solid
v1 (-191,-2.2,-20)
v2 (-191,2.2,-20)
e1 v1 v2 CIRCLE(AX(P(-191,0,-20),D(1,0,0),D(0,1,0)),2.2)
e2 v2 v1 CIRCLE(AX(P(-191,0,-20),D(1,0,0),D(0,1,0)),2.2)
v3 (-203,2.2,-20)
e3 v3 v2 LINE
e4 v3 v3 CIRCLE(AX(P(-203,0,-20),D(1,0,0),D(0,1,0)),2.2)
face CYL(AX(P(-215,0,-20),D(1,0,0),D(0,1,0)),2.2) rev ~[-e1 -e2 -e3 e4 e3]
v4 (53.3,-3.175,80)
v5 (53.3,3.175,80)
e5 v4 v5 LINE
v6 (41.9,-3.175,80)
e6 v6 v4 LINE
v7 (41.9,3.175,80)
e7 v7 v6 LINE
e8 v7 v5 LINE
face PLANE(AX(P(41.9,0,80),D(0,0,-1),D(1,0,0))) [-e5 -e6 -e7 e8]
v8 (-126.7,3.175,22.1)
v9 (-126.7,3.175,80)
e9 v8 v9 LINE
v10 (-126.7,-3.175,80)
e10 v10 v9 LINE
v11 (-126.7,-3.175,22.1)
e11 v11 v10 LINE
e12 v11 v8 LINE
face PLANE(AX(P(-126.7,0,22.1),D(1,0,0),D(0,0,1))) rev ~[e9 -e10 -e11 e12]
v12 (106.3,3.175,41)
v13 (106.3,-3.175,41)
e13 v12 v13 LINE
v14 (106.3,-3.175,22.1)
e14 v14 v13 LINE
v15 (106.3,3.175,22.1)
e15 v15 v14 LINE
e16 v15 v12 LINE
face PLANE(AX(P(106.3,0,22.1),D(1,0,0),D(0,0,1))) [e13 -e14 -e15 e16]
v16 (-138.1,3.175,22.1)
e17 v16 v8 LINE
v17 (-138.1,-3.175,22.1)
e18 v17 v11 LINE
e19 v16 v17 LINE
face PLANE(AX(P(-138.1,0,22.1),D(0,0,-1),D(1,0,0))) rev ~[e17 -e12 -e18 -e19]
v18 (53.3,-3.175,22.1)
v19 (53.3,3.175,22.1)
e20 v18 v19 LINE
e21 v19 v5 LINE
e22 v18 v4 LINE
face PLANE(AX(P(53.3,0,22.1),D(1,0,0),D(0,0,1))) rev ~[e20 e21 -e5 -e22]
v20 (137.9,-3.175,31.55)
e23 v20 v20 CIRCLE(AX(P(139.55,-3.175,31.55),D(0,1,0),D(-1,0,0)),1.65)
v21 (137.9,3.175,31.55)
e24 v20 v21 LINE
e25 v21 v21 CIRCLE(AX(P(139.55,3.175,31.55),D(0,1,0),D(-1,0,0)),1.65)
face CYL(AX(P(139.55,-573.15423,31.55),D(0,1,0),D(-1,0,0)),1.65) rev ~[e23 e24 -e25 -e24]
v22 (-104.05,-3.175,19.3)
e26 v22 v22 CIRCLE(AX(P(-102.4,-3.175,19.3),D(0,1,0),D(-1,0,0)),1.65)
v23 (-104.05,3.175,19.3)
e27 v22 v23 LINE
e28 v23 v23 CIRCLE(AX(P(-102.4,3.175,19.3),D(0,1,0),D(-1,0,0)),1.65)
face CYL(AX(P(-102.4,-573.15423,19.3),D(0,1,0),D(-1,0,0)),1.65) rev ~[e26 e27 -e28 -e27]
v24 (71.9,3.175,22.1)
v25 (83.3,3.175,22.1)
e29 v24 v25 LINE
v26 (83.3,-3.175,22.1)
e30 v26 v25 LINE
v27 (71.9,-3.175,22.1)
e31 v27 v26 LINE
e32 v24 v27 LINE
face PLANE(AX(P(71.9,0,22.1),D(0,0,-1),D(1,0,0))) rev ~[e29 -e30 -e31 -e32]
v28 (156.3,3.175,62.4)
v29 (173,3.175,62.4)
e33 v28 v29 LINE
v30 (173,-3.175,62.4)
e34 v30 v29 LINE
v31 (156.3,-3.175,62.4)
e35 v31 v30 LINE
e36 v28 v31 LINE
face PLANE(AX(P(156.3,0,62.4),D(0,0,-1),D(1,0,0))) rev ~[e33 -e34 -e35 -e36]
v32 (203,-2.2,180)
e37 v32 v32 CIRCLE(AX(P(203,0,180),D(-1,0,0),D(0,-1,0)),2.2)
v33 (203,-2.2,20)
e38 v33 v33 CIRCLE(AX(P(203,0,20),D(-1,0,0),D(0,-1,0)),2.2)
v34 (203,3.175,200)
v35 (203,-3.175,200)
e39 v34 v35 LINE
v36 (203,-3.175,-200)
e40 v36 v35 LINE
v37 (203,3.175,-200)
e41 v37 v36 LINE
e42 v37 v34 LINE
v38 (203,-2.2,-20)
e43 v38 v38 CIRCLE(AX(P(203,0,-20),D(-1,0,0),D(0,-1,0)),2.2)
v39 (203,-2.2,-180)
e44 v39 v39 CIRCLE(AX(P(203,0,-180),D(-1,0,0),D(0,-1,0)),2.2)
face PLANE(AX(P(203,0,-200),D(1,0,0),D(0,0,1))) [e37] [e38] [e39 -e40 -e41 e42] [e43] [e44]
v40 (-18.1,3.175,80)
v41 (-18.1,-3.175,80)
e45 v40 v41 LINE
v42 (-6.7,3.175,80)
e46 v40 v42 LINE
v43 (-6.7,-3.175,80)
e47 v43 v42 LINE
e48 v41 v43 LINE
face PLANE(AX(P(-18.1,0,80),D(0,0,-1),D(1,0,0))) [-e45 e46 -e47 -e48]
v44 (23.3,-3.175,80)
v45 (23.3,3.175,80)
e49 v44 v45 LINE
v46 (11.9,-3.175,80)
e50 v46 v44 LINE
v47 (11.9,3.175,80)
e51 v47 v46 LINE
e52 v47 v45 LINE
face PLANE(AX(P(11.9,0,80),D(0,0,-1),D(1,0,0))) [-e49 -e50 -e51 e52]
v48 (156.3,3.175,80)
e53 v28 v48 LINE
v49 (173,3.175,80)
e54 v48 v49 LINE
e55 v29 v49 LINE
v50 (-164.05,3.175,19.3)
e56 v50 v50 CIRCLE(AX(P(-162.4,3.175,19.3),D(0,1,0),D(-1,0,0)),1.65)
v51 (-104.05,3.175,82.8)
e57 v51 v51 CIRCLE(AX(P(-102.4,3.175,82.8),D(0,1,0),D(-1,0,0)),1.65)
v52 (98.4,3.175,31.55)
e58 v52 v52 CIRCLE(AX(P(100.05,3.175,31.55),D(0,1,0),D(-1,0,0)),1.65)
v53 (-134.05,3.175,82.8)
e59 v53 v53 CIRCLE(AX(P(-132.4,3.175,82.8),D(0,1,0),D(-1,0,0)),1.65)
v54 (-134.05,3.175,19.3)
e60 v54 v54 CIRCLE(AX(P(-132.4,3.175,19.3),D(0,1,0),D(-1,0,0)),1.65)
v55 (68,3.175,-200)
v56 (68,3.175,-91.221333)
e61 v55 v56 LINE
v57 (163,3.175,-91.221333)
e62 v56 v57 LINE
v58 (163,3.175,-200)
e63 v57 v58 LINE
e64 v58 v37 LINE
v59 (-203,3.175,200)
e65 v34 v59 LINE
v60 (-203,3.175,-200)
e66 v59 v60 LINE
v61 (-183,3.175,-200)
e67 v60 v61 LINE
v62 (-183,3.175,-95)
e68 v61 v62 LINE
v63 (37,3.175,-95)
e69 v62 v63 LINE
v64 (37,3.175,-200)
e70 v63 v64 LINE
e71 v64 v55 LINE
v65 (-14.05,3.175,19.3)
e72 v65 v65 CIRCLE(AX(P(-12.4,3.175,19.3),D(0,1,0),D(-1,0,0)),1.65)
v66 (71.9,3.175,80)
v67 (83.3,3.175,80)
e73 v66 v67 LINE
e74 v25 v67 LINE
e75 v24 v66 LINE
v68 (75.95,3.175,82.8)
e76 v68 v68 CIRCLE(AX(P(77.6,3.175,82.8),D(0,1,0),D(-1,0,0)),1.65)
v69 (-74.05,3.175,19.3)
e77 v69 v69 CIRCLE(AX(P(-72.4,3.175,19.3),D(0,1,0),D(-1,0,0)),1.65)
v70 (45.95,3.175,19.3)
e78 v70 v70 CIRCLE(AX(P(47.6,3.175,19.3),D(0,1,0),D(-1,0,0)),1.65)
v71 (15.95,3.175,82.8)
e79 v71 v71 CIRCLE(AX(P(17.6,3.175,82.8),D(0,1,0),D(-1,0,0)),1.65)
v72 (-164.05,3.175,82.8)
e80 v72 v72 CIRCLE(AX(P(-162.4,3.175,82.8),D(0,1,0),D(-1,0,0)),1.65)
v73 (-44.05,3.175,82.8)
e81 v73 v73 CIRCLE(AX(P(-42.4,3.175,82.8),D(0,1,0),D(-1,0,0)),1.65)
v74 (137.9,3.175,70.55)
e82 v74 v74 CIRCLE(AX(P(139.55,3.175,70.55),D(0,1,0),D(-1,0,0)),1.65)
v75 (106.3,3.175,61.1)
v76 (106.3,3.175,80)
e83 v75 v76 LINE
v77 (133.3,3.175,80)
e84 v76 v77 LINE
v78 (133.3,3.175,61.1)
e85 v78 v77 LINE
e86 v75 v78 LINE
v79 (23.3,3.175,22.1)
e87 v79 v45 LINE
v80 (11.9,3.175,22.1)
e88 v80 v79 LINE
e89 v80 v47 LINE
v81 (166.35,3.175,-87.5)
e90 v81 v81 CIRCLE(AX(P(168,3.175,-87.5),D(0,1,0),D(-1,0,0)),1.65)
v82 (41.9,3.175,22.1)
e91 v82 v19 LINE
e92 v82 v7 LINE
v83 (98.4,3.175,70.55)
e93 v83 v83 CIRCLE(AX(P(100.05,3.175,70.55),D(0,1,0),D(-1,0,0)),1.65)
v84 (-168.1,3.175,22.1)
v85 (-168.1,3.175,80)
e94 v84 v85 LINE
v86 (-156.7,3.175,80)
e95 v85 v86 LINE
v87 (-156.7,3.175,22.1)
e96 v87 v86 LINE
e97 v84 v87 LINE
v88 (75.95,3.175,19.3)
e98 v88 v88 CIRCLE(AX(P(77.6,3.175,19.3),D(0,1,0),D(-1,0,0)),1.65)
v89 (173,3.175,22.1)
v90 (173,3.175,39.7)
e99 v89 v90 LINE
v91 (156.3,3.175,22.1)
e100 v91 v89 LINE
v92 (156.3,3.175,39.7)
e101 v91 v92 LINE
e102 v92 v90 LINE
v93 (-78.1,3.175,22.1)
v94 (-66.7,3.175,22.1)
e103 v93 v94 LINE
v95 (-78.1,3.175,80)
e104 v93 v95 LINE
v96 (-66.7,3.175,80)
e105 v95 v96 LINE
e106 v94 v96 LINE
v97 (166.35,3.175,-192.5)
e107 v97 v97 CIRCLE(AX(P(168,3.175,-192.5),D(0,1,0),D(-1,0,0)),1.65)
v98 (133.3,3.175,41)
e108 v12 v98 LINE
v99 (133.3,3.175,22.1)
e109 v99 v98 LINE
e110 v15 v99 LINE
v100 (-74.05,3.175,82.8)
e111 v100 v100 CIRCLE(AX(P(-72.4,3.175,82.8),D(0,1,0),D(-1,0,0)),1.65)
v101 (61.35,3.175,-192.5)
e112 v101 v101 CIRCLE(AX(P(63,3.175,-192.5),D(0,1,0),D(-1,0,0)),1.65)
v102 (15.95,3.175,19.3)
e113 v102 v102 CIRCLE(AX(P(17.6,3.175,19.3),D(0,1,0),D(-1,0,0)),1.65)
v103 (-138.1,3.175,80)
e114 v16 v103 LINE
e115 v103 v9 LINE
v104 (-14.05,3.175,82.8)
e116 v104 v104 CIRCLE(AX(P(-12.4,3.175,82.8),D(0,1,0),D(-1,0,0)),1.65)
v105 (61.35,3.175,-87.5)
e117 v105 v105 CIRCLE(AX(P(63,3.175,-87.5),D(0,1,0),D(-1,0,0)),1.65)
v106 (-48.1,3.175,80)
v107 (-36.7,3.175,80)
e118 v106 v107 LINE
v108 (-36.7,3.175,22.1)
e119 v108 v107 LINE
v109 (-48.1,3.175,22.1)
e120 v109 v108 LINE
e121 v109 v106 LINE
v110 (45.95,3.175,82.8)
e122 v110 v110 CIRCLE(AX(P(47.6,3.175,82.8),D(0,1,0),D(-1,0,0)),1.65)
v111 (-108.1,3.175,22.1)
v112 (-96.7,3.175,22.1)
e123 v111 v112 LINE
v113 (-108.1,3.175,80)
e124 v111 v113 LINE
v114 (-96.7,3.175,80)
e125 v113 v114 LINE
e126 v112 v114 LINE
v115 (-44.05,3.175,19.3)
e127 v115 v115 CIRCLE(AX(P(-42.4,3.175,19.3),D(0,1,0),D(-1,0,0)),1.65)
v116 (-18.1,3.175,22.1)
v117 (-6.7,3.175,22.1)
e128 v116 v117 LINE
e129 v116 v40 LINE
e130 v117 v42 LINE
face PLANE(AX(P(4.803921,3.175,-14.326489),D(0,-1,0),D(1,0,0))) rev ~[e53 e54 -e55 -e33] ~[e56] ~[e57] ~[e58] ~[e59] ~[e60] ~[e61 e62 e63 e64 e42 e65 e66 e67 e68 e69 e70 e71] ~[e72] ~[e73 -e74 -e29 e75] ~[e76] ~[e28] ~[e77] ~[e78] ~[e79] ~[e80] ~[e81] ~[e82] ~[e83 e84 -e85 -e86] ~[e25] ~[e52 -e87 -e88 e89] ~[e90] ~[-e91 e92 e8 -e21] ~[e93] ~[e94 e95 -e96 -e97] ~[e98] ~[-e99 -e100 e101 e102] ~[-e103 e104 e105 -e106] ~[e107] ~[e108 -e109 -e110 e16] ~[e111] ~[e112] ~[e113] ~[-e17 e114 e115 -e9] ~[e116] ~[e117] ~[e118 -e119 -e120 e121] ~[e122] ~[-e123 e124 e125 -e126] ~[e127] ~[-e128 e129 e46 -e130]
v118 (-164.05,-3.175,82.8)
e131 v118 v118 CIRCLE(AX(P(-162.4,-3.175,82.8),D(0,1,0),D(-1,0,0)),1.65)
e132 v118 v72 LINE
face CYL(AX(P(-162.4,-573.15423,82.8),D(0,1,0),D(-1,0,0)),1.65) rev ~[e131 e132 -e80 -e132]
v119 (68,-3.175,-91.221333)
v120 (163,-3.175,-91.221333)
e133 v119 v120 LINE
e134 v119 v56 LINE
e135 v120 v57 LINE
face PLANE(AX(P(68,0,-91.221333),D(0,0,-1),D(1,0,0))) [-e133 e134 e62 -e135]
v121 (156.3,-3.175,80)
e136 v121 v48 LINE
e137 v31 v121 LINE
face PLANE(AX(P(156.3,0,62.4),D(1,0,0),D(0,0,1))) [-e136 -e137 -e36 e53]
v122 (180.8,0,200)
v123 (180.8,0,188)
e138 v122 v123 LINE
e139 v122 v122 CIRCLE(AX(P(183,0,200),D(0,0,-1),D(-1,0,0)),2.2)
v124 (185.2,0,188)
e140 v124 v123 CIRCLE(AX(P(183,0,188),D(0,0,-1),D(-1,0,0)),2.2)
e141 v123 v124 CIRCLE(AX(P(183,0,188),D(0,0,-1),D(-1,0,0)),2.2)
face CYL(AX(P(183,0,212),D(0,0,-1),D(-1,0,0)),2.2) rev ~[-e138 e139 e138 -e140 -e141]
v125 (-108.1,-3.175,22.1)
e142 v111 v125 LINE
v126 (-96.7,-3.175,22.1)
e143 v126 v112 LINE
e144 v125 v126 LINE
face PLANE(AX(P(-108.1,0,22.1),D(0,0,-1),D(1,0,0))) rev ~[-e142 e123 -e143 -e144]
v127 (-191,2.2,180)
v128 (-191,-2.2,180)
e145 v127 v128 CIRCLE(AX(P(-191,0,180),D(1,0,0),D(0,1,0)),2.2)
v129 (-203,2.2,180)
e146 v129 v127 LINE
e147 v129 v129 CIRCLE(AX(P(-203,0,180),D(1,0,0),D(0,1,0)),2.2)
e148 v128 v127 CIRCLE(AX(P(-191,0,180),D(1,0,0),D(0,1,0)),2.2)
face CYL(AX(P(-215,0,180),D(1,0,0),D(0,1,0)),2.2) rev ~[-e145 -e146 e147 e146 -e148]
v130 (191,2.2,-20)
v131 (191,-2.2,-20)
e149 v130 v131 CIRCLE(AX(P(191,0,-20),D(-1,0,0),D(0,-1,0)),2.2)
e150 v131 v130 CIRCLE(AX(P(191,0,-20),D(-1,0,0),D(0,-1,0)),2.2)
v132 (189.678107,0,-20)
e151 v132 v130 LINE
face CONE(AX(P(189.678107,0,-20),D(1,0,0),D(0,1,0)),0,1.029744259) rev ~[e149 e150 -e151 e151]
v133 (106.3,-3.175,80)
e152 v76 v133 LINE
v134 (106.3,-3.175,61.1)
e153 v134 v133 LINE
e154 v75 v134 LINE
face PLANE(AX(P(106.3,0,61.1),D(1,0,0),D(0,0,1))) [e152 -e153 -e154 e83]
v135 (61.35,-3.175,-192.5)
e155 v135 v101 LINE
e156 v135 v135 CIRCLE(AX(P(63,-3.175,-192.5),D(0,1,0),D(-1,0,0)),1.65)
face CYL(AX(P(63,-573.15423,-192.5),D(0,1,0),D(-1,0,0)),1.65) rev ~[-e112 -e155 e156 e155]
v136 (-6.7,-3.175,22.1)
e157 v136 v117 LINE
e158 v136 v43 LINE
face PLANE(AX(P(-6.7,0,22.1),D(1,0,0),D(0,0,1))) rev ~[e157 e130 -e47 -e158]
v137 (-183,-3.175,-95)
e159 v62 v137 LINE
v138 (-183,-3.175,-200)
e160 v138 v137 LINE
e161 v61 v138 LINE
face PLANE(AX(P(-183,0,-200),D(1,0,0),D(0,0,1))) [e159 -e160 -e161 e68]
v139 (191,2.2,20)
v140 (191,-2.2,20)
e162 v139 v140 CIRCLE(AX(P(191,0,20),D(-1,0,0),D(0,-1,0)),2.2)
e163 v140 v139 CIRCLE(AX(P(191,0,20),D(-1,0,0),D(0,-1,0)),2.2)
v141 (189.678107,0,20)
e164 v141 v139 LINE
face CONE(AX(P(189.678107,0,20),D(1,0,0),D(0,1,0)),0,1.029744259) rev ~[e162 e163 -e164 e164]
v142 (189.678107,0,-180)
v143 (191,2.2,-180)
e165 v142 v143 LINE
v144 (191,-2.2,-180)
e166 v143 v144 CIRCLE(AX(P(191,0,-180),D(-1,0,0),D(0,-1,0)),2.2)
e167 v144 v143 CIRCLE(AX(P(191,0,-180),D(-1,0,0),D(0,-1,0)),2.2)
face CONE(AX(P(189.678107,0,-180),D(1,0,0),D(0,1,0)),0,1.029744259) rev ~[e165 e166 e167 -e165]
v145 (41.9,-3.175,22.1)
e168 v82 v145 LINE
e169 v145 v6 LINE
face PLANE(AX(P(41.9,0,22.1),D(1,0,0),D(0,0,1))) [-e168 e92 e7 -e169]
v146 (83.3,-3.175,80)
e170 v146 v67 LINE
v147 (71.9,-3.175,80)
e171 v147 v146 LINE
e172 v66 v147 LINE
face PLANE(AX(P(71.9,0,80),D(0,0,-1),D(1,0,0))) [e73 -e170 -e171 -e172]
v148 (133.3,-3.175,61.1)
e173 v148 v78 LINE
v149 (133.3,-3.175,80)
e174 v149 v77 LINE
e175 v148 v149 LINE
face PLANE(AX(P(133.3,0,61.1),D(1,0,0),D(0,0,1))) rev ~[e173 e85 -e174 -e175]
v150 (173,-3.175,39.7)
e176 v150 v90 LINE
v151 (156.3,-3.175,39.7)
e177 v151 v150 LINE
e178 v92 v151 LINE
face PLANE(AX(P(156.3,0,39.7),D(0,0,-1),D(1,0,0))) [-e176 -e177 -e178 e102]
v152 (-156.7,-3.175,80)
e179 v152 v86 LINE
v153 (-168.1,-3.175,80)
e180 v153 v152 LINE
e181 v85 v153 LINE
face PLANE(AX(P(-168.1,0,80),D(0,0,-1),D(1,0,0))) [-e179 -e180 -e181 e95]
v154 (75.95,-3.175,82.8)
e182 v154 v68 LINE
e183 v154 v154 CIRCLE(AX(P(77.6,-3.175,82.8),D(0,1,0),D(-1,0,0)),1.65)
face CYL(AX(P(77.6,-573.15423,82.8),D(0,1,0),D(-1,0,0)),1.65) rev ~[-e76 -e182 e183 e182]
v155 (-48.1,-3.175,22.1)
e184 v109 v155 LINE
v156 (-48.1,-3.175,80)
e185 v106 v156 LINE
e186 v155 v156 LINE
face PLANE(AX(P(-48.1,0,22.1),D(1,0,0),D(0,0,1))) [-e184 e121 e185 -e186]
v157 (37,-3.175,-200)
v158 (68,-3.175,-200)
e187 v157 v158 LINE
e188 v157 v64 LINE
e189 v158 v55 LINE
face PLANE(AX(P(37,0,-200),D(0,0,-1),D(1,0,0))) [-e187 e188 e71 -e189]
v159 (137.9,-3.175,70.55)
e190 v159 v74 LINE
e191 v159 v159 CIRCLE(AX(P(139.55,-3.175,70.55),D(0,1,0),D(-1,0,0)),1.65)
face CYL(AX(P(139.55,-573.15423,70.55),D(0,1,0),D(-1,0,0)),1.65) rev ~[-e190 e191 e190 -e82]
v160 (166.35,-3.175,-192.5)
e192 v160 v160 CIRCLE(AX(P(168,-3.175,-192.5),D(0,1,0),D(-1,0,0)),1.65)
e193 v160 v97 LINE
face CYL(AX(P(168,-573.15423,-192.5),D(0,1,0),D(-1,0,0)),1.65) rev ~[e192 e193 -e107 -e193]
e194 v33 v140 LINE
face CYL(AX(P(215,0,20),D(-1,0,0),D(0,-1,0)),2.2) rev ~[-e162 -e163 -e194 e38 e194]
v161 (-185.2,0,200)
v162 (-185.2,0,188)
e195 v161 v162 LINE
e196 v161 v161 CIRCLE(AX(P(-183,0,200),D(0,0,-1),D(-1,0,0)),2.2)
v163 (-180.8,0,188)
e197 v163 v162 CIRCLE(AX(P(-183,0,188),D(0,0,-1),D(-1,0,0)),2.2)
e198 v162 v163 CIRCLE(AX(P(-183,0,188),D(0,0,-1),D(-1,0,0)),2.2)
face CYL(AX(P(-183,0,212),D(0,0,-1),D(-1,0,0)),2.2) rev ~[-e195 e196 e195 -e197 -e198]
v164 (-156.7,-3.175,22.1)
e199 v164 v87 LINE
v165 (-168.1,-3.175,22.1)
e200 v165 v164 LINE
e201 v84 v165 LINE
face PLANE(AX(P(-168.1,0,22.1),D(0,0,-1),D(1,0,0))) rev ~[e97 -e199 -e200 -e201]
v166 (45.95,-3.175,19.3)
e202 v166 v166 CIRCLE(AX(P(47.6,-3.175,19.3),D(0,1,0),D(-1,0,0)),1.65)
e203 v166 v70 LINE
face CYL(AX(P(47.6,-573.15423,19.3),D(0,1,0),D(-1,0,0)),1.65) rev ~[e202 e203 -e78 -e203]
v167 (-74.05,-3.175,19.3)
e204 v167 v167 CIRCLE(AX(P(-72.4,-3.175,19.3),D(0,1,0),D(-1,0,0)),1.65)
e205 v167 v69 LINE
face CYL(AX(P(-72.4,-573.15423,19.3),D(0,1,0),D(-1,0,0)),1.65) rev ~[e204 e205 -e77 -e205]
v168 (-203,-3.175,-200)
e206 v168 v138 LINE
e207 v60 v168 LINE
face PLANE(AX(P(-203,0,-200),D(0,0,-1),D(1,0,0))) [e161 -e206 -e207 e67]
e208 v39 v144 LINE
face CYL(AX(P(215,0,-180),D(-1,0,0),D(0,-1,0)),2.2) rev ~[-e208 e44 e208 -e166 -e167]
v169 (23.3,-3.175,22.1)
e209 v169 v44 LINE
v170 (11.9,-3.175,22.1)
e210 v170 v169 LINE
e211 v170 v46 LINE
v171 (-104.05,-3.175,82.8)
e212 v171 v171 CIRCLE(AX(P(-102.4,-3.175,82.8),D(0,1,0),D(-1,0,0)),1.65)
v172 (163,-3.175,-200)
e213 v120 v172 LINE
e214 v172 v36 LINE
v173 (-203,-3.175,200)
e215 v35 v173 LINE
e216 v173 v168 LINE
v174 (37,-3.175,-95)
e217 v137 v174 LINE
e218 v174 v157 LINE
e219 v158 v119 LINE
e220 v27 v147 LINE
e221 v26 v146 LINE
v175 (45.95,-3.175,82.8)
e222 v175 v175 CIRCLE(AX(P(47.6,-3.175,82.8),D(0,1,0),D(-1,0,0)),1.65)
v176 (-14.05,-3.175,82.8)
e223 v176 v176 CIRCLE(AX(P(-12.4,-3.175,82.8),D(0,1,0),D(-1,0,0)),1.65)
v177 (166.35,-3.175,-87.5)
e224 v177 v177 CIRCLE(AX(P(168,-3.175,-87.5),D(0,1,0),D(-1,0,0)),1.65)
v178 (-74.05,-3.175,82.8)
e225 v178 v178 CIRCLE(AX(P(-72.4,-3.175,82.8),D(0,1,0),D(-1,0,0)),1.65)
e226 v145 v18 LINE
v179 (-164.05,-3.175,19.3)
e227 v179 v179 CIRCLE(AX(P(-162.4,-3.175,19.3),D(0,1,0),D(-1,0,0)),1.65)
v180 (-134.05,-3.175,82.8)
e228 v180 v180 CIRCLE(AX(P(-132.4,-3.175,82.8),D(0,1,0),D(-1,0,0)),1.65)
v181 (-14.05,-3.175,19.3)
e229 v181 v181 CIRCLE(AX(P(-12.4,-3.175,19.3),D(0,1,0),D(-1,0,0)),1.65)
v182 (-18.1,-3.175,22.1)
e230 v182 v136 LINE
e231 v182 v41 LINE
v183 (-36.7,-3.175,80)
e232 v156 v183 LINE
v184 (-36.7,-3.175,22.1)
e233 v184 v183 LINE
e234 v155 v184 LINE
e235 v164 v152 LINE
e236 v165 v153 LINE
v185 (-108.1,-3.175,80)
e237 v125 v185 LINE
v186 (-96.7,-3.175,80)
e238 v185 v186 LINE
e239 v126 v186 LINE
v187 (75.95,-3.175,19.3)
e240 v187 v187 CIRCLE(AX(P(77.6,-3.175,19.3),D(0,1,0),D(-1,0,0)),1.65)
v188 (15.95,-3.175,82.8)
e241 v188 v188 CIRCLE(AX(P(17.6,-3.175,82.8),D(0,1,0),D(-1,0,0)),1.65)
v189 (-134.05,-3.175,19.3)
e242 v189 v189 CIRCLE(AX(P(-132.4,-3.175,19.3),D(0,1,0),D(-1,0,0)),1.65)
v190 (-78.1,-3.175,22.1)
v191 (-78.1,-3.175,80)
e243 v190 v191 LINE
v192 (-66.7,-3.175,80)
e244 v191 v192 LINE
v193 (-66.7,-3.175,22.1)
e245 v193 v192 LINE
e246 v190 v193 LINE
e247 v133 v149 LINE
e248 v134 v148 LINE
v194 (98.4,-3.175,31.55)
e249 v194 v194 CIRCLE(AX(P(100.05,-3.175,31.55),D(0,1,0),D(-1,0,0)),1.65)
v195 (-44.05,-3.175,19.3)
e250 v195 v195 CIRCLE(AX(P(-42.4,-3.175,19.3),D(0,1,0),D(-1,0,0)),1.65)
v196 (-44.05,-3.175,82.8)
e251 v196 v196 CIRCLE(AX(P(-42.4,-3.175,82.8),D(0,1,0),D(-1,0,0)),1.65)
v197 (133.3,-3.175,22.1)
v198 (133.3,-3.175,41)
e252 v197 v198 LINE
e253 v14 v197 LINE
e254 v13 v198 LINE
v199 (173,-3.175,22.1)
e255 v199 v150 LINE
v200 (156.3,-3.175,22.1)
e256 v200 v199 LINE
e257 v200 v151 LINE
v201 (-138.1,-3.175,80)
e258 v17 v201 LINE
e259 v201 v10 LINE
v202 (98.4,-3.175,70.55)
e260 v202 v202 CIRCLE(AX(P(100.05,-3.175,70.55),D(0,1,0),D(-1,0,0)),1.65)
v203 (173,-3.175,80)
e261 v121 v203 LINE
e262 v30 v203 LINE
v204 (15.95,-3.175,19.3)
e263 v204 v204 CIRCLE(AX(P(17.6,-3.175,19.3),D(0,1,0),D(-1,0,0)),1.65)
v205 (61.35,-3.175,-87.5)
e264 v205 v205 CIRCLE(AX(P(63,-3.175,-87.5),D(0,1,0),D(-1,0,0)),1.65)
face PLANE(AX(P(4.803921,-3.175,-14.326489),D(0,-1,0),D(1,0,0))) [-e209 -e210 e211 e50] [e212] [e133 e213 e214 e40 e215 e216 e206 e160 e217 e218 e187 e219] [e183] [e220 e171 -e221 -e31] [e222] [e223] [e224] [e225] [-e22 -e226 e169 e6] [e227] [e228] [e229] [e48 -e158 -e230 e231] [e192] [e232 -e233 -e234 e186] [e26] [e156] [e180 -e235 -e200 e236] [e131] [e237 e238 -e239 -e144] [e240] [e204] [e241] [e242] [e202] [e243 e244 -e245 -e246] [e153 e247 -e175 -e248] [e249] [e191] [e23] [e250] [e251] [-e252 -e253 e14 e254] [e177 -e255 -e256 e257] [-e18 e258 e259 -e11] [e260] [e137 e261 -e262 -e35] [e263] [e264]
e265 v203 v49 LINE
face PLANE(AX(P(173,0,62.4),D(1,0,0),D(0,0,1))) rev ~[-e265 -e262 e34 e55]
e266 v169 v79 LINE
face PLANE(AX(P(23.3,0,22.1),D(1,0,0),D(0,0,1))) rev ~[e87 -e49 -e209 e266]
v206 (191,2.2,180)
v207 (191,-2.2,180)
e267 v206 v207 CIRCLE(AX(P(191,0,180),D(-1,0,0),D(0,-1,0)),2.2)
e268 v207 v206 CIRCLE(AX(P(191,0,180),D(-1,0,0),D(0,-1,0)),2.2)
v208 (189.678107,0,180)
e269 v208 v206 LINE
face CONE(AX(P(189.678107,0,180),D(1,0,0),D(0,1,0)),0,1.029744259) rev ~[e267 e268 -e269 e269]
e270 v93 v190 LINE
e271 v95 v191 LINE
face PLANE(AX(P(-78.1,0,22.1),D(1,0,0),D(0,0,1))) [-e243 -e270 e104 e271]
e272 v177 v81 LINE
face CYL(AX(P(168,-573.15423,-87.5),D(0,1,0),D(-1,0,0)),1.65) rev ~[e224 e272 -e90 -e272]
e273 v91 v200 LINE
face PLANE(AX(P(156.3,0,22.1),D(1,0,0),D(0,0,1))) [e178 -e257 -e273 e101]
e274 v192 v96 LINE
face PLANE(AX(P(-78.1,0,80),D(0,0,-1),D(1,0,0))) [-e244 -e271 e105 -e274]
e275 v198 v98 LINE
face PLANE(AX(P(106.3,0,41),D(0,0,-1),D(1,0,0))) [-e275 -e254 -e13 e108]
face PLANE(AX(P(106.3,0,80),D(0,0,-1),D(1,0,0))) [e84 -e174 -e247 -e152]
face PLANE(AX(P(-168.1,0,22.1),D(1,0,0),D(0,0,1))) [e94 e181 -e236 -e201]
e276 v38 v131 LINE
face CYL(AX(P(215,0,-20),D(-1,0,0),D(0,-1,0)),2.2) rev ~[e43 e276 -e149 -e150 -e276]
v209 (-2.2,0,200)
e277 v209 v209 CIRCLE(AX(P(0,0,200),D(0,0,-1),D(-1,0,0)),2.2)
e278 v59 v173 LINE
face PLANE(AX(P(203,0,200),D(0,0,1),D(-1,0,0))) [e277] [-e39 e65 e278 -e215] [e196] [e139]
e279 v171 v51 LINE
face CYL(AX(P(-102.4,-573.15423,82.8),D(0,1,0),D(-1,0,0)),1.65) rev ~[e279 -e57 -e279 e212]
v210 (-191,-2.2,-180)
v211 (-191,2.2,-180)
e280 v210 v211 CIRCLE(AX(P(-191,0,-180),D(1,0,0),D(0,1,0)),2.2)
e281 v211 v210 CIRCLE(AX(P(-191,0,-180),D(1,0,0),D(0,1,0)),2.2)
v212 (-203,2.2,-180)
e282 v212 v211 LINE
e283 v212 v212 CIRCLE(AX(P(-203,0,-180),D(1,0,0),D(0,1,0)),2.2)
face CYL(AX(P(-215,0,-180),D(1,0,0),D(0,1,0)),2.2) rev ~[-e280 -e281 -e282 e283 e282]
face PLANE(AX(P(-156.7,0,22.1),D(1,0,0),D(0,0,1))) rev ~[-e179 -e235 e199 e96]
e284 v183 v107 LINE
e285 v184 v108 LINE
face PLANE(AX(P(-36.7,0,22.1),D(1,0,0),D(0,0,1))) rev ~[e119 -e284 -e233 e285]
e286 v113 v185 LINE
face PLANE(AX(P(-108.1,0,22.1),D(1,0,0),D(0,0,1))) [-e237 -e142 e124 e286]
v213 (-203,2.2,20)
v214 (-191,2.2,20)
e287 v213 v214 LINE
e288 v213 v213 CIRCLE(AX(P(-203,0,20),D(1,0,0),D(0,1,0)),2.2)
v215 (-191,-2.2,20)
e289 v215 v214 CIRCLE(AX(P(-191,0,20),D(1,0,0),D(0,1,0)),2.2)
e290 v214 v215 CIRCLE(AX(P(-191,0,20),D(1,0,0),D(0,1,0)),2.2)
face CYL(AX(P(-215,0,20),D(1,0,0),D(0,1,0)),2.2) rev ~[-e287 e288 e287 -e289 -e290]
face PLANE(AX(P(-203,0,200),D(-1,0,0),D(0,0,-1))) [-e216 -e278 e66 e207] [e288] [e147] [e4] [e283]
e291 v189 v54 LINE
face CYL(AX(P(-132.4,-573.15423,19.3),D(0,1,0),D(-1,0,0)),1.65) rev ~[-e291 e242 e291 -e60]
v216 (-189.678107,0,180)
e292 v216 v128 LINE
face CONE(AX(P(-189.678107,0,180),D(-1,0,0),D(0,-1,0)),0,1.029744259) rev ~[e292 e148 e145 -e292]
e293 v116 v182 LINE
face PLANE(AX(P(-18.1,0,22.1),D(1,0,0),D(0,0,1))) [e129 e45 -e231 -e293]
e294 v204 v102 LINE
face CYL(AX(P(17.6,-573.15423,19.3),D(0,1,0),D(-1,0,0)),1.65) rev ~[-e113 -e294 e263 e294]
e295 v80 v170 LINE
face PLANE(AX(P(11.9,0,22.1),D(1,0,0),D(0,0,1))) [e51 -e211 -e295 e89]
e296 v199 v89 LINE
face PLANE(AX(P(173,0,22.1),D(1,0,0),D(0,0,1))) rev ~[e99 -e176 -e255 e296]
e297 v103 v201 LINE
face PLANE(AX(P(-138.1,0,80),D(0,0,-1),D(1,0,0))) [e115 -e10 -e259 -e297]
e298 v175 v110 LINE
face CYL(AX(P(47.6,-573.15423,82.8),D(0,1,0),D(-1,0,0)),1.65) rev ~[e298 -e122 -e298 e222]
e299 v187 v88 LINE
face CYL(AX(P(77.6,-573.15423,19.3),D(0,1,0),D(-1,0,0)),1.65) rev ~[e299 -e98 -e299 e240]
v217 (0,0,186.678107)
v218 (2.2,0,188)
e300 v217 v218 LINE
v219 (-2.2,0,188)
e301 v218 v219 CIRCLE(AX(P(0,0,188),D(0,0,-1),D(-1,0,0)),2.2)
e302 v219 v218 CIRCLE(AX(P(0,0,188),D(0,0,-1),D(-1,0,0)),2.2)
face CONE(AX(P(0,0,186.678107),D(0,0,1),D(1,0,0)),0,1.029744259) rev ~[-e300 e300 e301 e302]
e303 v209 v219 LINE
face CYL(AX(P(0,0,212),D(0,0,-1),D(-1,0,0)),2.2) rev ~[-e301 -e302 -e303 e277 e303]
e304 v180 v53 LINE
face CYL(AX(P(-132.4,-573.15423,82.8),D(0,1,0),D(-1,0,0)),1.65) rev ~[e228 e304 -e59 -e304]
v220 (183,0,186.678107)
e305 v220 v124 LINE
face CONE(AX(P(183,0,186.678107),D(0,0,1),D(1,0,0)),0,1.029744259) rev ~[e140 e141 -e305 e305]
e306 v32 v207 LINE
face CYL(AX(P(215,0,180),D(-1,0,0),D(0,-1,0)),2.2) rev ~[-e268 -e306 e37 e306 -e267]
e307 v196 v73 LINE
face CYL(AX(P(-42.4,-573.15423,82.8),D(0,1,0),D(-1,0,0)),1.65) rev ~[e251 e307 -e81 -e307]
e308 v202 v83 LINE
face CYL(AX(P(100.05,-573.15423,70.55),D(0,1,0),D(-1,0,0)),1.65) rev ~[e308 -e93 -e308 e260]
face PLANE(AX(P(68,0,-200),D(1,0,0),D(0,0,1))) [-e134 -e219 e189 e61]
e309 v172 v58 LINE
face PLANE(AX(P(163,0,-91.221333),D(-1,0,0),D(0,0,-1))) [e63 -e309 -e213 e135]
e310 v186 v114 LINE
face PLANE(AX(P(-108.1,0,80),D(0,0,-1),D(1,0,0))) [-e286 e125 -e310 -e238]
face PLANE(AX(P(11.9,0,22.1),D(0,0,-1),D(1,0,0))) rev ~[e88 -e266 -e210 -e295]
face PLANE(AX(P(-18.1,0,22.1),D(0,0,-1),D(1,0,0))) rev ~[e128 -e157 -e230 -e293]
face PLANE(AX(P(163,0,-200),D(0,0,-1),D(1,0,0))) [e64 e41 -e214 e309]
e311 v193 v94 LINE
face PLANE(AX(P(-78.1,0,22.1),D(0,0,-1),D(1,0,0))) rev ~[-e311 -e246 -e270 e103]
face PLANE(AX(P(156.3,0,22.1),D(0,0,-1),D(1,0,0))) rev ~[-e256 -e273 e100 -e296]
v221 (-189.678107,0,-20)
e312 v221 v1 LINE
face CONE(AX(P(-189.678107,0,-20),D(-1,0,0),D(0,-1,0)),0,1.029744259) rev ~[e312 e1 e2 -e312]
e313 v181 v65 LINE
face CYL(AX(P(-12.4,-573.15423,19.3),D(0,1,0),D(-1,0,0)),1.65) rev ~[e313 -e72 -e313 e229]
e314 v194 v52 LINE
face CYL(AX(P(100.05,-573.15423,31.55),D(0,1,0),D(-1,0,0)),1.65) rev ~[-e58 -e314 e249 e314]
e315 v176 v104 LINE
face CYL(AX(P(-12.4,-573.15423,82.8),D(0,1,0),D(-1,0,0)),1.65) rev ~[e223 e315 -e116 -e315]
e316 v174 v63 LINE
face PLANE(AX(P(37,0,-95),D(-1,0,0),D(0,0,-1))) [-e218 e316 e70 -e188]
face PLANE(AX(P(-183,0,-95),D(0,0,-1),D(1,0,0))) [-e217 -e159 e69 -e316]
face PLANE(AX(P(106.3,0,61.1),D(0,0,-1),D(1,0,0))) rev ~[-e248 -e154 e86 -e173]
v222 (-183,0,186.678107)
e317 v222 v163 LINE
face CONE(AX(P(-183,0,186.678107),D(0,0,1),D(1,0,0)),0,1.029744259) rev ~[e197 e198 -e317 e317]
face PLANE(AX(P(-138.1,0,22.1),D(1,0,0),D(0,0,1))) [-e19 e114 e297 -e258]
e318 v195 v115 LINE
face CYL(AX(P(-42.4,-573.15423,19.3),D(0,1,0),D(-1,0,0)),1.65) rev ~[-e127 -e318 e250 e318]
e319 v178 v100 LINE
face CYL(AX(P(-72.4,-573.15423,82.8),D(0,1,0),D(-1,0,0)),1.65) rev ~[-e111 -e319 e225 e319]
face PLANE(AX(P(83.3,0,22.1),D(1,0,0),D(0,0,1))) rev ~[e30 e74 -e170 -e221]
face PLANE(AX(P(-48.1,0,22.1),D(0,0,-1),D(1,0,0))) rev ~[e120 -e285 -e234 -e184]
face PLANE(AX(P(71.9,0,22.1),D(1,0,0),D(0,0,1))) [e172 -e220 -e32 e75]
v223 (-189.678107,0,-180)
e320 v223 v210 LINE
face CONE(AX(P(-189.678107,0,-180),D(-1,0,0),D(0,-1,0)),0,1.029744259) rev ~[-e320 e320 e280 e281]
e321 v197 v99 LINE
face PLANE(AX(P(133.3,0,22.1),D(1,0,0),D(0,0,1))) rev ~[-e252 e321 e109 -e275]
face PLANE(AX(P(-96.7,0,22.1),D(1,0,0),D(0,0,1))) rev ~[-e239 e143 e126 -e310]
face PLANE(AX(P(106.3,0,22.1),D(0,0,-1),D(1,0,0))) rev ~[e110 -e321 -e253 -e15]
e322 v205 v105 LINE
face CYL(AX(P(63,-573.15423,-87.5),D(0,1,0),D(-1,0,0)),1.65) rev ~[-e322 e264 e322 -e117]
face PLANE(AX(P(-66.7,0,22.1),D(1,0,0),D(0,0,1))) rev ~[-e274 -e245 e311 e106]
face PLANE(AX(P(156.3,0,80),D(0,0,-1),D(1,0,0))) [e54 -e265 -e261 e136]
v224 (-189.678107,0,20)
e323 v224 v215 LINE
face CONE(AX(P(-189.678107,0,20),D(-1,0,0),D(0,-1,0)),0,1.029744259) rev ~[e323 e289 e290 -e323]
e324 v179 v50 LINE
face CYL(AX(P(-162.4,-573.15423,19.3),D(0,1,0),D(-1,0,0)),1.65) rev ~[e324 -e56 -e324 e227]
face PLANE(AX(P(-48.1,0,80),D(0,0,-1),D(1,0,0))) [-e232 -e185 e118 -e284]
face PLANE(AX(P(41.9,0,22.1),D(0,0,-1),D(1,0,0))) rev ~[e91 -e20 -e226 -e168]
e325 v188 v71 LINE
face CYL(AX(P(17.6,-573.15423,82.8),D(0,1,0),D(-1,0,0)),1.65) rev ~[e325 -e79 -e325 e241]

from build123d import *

# Parameters (mm, degrees)
F0_W           = 11.4
F0_H           = 57.9
F0_W_2         = 27
F0_H_2         = 18.9
F0_W_3         = 16.7
F0_H_3         = 17.6
F1_DEPTH       = 3.175
F5_D           = 4.4
F5_DEPTH       = 12
F5_TIP         = 1.3218933619
F6_D           = 4.4
F6_DEPTH       = 12
F6_TIP         = 1.3218933619
F6_ON_F4_D     = 4.4
F6_ON_F4_DEPTH = 12
F6_ON_F4_TIP   = 1.3218933619
F8_D           = 3.3


# Not quite as in the source:
# - a feature names something its author has since deleted; it is built from what else it names


with BuildPart() as f1:
    # F0 (on Front) → F1 (new body, symmetric)
    with BuildSketch(Plane.XZ):
        Polygon((163, -200), (203, -200), (203, 200), (-203, 200), (-203, -200), (-183, -200), (-183, -95), (37, -95), (37, -200), (68, -200), (68, -91.22133255), (163, -91.22133255), align=None)
        with Locations((-162.4, 51.05)):
            Rectangle(F0_W, F0_H, mode=Mode.SUBTRACT)
        with Locations((-132.4, 51.05)):
            Rectangle(F0_W, F0_H, mode=Mode.SUBTRACT)
        with Locations((-102.4, 51.05)):
            Rectangle(F0_W, F0_H, mode=Mode.SUBTRACT)
        with Locations((-72.4, 51.05)):
            Rectangle(F0_W, F0_H, mode=Mode.SUBTRACT)
        with Locations((-42.4, 51.05)):
            Rectangle(F0_W, F0_H, mode=Mode.SUBTRACT)
        with Locations((-12.4, 51.05)):
            Rectangle(F0_W, F0_H, mode=Mode.SUBTRACT)
        with Locations((17.6, 51.05)):
            Rectangle(F0_W, F0_H, mode=Mode.SUBTRACT)
        with Locations((47.6, 51.05)):
            Rectangle(F0_W, F0_H, mode=Mode.SUBTRACT)
        with Locations((77.6, 51.05)):
            Rectangle(F0_W, F0_H, mode=Mode.SUBTRACT)
        with Locations((119.8, 31.55)):
            Rectangle(F0_W_2, F0_H_2, mode=Mode.SUBTRACT)
        with Locations((164.65, 30.9)):
            Rectangle(F0_W_3, F0_H_3, mode=Mode.SUBTRACT)
        with Locations((119.8, 70.55)):
            Rectangle(F0_W_2, F0_H_2, mode=Mode.SUBTRACT)
        with Locations((164.65, 71.2)):
            Rectangle(F0_W_3, F0_H_3, mode=Mode.SUBTRACT)
    extrude(amount=F1_DEPTH, both=True)

    # F5
    with Locations(Plane.XY.offset(200)):
        with Locations((-183, 0), (0, 0), (183, 0)):
            Hole(F5_D / 2, depth=F5_DEPTH)
            with Locations((0, 0, -(F5_DEPTH + F5_TIP / 2))):  # 118° drill point
                Cone(0, F5_D / 2, F5_TIP, mode=Mode.SUBTRACT)

    # F6
    with Locations(Plane(origin=(-203, 0, 0), x_dir=(0, -1, 0), z_dir=(-1, 0, 0))):
        with Locations((0, -180), (0, -20), (0, 20), (0, 180)):
            Hole(F6_D / 2, depth=F6_DEPTH)
            with Locations((0, 0, -(F6_DEPTH + F6_TIP / 2))):  # 118° drill point
                Cone(0, F6_D / 2, F6_TIP, mode=Mode.SUBTRACT)

    # F6 on F4
    with Locations(Plane.YZ.offset(203)):
        with Locations((0, -180), (0, -20), (0, 20), (0, 180)):
            Hole(F6_ON_F4_D / 2, depth=F6_ON_F4_DEPTH)
            with Locations((0, 0, -(F6_ON_F4_DEPTH + F6_ON_F4_TIP / 2))):  # 118° drill point
                Cone(0, F6_ON_F4_D / 2, F6_ON_F4_TIP, mode=Mode.SUBTRACT)

    # F8 (through all)
    with Locations(Plane.XZ.offset(3.175)):
        with Locations((63, -87.5), (168, -87.5), (168, -192.5), (63, -192.5), (77.6, 82.8), (47.6, 82.8), (77.6, 19.3), (47.6, 19.3), (17.6, 19.3), (17.6, 82.8), (-12.4, 82.8), (-12.4, 19.3), (-42.4, 19.3), (-42.4, 82.8), (-72.4, 82.8), (-72.4, 19.3), (-102.4, 19.3), (-102.4, 82.8), (-132.4, 82.8), (-132.4, 19.3), (-162.4, 19.3), (-162.4, 82.8), (139.55, 70.55), (100.05, 70.55), (100.05, 31.55), (139.55, 31.55)):
            Hole(F8_D / 2)


solid = f1.part
